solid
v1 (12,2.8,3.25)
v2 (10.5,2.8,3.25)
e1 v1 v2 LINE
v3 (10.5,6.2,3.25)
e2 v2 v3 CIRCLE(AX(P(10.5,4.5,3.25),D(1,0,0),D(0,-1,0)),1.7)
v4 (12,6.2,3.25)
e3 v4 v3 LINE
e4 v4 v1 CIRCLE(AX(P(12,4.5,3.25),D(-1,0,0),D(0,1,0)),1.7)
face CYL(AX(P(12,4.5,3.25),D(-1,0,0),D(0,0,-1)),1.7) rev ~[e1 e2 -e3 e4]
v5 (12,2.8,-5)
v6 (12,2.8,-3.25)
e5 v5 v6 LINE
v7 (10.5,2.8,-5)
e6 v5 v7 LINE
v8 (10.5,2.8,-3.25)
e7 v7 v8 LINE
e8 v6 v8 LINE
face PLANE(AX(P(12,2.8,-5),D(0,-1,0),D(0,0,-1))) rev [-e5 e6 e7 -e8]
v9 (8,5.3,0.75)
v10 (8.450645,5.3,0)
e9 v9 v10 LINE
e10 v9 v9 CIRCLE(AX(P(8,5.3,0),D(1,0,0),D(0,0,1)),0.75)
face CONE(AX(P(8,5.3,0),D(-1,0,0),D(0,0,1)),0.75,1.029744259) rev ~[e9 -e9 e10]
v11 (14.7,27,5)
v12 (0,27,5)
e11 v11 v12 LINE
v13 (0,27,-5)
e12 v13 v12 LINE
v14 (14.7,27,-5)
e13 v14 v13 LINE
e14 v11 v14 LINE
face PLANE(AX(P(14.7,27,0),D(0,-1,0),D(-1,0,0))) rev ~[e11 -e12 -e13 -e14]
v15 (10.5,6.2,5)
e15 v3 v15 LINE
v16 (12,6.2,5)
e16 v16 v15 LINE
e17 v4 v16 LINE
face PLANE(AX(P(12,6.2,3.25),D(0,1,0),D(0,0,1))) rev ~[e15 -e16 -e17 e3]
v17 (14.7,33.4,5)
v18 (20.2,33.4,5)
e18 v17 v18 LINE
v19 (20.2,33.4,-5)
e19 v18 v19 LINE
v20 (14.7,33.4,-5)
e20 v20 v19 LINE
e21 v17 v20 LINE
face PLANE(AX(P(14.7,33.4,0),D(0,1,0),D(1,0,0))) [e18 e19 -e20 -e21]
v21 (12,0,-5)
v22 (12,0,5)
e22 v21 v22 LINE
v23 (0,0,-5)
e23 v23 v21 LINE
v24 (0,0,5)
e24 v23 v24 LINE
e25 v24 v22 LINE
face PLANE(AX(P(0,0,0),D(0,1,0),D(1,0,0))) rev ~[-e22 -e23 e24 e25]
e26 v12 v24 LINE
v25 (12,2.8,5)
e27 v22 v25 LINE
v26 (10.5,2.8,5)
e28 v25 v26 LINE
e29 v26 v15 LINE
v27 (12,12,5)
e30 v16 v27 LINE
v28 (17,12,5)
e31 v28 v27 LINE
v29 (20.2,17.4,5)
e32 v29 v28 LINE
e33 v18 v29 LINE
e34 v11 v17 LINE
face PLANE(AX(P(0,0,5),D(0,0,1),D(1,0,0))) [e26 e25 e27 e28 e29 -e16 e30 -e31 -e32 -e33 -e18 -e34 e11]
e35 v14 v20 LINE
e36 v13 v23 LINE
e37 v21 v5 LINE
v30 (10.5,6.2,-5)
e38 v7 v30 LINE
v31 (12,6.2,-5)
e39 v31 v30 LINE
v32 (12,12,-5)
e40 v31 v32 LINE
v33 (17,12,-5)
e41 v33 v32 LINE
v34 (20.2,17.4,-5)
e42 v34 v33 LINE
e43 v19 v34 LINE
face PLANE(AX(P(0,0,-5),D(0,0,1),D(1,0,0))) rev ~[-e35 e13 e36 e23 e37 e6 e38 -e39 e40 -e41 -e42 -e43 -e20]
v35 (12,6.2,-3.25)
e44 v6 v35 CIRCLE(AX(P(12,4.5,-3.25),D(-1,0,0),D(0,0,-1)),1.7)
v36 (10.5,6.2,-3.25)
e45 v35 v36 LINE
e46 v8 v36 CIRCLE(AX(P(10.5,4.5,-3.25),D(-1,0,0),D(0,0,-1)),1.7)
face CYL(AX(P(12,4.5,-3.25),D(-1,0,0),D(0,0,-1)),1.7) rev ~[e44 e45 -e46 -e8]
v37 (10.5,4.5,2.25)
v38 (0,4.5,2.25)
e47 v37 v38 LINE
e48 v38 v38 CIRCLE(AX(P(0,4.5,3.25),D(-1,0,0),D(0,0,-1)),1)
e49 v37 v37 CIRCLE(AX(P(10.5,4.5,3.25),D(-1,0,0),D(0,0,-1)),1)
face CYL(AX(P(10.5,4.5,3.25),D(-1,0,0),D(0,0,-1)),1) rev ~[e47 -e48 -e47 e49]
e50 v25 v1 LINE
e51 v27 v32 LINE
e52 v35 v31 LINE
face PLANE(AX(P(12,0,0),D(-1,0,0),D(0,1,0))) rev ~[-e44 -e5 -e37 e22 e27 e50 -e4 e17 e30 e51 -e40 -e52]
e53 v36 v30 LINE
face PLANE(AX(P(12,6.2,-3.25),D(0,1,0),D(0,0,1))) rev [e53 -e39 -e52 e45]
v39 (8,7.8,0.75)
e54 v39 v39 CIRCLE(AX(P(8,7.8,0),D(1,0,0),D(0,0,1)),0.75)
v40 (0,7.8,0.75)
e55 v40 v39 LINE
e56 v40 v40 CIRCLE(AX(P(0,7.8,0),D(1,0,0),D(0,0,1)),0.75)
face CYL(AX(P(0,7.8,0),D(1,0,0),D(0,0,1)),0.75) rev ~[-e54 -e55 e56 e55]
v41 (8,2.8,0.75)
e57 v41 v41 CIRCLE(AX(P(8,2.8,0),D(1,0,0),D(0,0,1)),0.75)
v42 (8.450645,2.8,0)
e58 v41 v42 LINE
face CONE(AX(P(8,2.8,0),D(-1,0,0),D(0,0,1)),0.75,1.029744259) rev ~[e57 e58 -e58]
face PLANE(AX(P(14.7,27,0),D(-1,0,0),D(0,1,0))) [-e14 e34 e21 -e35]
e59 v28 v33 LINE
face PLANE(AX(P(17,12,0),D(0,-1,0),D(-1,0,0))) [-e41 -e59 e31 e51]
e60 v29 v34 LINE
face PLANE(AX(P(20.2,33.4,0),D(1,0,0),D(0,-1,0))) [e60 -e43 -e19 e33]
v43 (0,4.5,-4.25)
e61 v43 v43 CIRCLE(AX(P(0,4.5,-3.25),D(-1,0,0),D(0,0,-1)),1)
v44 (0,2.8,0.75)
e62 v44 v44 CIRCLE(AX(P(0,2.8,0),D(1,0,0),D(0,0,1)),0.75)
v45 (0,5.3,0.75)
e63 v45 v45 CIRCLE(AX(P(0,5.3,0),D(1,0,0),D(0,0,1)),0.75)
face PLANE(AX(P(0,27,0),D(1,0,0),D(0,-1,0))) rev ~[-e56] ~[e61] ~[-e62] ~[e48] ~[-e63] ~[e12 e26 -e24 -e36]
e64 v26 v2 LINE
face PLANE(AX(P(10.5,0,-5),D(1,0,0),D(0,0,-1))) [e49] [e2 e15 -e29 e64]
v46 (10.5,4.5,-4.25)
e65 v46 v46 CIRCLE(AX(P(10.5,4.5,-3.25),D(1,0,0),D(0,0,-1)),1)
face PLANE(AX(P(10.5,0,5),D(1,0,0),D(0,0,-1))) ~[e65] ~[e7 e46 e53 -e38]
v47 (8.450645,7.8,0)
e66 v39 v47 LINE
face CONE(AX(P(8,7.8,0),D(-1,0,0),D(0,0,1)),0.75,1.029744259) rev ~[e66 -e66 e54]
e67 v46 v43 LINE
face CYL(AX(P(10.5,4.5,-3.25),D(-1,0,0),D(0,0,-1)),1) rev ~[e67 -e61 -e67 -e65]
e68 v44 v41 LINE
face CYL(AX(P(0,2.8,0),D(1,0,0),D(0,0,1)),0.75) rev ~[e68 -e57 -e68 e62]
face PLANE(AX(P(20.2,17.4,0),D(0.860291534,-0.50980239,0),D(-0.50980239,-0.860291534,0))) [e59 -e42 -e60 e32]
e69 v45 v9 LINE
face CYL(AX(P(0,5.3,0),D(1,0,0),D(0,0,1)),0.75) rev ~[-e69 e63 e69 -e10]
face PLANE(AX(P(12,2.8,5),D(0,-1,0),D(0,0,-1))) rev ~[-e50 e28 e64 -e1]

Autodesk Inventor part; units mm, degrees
ref_plane "YZ Plane" through (0, 0, 0) normal (1, 0, 0) x (0, 1, 0)
ref_plane "XZ Plane" through (0, 0, 0) normal (0, 1, 0) x (-1, 0, 0)
ref_plane "XY Plane" through (0, 0, 0) normal (0, 0, 1) x (1, 0, 0)
sketch "Skizze1" plane through (0, 0, 0) normal (0, 0, 1) x (1, 0, 0)
  line L0 (0, 40.08) -> (0, -6.68) projected
  line L1 (-4.04, 0) -> (24.24, 0) projected
  line L2 (0, 0) -> (12, 0)
  line L3 (12, 0) -> (12, 12)
  line L4 (14.7, 27) -> (0, 27)
  line L5 (0, 27) -> (0, 0)
  line L6 (14.7, 27) -> (14.7, 33.4)
  line L7 (14.7, 33.4) -> (20.2, 33.4)
  line L8 (20.2, 33.4) -> (20.2, 17.4)
  line L9 (20.2, 17.4) -> (17, 12)
  line L10 (17, 12) -> (12, 12)
  dimension "d0" = 5.5
  dimension "d1" = 14.7
  dimension "d3" = 12
  dimension "d4" = 27
  dimension "d5" = 12
  dimension "d6" = 5
  dimension "d7" = 6.4
  dimension "d8" = 16
extrude "Extrusion1" add sketch "Skizze1" along normal mid plane 10
hole "Bohrung1" at (12, 4.5, 3.25) direction (-1, 0, 0) diameter 2 end up to surface counterbore diameter 3.4 counterbore depth 1.5
sketch "Skizze2" plane through (12, 0, -5) normal (1, 0, 0) x (0, 0, -1)
  circle A0 centre (-8.25, 4.5) radius 1.7 projected
  line L0 (-10, 0) -> (-10, 27) projected
  line L1 (-10, 2.8) -> (-8.25, 2.8)
  line L2 (-8.25, 2.8) -> (-8.25, 6.2)
  line L3 (-8.25, 6.2) -> (-10, 6.2)
  line L4 (-10, 6.2) -> (-10, 2.8)
  point P0 (-10, 5.3874)
  point P1 (-10, 3.6126)
extrude "Extrusion2" cut sketch "Skizze2" against normal up to surface (1.5 mm away) contours L2 A0 | A0 L1 L0 L3 picked at (-8.7614, 4.0923)
mirror "Spiegeln1" about plane through (0, 0, 0) normal (0, 0, 1) of "Bohrung1", "Extrusion2"
sketch "Skizze3" plane through (0, 0, 5) normal (-1, 0, 0) x (0, 0, 1)
  line L0 (0, 0) -> (0, 27) projected
  line L1 (0, 0) -> (-10, 0) projected
  circle A0 centre (-1.75, 4.5) radius 1 projected
  point P0 (-5, 2.8)
  point P1 (-5, 5.3)
  point P2 (-5, 7.8)
  dimension "d22" = 2.5
  dimension "d23" = 2.5
  dimension "d24" = 2.8
  dimension "d25" = 7.8
  dimension "d26" = 5
  dimension "d27" = 5.3
  dimension "d35" = 0.8
hole "Bohrung2" at (0, 2.8, 0) at (0, 5.3, 0) at (0, 7.8, 0) direction (1, 0, 0) diameter 1.5 depth 8 tip angle 118
equation "\"d23\" = d22"
properties part number "Ventil_numatics"
